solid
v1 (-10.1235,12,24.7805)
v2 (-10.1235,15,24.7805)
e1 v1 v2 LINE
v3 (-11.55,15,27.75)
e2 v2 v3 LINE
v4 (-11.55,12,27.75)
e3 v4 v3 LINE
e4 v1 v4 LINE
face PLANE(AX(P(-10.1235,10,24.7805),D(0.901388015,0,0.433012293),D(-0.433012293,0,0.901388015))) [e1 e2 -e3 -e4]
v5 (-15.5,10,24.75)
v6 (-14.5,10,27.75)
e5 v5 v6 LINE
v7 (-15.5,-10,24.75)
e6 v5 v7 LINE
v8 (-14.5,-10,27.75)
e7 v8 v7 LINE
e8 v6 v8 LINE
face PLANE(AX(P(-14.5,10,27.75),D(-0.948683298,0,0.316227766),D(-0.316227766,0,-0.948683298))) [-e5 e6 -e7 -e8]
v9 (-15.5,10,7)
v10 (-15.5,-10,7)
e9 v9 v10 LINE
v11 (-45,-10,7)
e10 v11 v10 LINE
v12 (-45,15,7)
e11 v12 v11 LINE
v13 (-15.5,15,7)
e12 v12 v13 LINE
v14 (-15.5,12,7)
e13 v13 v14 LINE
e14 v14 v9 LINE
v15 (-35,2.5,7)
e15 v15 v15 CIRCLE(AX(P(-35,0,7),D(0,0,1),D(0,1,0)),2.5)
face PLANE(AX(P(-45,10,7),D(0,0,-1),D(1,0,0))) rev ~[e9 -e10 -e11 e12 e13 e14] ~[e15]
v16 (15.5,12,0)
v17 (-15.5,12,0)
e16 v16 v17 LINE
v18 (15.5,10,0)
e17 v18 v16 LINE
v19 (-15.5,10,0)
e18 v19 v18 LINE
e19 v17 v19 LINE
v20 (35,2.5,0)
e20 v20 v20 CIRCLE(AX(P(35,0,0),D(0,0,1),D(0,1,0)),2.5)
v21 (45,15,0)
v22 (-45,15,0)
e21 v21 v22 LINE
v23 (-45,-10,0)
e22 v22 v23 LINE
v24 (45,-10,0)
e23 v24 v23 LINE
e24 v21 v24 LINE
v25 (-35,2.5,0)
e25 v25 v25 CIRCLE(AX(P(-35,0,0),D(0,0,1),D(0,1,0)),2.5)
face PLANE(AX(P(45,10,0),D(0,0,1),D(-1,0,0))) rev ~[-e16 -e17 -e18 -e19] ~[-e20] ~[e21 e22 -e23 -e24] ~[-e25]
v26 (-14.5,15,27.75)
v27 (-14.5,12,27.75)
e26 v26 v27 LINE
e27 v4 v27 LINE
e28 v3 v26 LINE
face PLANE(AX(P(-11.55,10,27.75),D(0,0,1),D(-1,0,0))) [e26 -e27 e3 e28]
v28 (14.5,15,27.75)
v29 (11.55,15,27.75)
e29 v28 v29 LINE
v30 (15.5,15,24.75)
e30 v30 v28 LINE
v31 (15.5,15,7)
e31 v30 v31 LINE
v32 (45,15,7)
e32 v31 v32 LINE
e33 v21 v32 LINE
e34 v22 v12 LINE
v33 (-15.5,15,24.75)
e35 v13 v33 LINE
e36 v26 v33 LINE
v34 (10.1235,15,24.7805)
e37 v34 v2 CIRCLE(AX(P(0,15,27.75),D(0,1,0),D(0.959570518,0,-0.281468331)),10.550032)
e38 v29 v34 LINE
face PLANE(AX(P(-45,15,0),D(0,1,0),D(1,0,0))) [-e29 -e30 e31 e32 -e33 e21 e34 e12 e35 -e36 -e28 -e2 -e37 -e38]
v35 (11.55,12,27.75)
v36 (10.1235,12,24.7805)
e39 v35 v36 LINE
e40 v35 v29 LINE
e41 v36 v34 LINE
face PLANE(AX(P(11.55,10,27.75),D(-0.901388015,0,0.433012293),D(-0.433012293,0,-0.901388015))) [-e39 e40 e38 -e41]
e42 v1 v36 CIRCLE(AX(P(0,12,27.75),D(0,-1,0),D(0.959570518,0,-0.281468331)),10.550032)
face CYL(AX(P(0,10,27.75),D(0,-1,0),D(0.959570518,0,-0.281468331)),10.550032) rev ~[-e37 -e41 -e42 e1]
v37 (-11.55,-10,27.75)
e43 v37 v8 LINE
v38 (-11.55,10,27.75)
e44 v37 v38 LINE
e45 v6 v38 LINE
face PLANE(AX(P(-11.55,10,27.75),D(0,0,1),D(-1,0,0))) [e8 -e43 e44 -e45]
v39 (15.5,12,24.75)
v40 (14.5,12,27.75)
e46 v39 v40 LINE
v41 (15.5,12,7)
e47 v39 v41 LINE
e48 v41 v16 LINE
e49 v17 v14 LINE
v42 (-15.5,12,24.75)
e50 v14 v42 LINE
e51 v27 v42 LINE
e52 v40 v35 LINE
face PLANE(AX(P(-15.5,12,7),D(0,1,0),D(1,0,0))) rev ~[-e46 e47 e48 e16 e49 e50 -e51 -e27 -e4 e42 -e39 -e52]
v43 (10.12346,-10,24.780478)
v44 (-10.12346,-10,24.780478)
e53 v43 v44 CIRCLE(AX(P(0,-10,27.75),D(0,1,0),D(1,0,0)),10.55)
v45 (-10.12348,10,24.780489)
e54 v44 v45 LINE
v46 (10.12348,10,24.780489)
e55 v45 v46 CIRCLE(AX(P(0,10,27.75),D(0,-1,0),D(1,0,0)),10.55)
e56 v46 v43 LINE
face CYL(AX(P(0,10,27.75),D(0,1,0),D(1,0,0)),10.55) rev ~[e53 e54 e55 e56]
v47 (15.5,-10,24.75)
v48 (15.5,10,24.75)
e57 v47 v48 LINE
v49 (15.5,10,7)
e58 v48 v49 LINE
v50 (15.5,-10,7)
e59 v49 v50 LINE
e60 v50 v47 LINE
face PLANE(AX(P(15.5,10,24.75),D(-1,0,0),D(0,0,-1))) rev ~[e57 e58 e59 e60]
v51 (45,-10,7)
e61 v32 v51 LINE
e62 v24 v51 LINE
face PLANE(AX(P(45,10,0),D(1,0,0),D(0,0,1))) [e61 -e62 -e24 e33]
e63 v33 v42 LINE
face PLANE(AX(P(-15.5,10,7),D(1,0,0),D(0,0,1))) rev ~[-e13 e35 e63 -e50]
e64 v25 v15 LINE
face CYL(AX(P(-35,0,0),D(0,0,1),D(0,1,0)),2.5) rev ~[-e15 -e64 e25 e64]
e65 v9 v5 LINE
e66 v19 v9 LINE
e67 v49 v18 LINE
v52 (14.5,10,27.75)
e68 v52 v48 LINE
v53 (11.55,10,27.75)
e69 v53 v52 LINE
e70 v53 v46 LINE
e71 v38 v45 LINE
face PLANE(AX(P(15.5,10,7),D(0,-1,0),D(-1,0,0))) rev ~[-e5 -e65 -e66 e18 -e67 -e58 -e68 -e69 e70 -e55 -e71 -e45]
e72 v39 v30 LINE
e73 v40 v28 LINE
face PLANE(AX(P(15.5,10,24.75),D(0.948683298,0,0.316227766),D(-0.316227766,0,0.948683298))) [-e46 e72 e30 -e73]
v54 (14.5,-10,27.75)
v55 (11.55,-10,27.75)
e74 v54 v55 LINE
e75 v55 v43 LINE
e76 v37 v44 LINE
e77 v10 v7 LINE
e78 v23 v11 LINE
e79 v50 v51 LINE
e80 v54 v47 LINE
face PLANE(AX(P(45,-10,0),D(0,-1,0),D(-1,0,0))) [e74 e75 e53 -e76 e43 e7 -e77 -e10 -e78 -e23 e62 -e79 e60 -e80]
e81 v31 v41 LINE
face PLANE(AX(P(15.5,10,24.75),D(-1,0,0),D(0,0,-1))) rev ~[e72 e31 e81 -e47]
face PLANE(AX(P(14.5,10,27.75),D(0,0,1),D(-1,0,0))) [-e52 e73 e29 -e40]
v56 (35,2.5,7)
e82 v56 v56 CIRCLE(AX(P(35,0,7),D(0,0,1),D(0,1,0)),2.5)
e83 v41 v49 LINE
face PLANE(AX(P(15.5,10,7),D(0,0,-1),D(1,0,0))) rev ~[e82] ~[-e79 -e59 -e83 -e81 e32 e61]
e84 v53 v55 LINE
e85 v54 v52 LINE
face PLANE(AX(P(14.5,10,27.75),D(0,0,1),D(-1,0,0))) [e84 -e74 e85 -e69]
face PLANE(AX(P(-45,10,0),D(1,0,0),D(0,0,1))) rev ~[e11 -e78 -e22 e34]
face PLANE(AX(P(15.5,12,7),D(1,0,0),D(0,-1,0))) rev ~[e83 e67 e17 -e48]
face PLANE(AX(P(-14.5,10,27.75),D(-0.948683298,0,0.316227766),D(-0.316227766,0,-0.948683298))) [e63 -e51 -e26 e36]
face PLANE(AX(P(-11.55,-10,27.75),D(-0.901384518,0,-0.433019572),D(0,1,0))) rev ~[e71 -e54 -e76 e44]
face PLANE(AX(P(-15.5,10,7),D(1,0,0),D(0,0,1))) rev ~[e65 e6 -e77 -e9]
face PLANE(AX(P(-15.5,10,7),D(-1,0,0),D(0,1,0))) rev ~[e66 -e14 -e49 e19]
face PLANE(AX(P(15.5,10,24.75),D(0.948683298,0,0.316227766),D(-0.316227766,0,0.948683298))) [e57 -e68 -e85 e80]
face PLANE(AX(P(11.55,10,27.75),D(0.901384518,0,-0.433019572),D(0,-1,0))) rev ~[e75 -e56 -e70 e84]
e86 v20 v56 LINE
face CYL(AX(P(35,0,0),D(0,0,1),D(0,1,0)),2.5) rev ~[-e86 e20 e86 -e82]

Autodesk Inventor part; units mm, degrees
ref_plane "YZ Plane" through (0, 0, 0) normal (1, 0, 0) x (0, 1, 0)
ref_plane "XZ Plane" through (0, 0, 0) normal (0, 1, 0) x (-1, 0, 0)
ref_plane "XY Plane" through (0, 0, 0) normal (0, 0, 1) x (1, 0, 0)
sketch "Sketch1" plane through (0, 0, 0) normal (0, 0, 1) x (1, 0, 0)
  line L0 (-45, 10) -> (45, 10)
  line L1 (45, 10) -> (45, -10)
  line L2 (45, -10) -> (-45, -10)
  line L3 (-45, -10) -> (-45, 10)
  point P0 (0, 0)
  point P1 (0, 10)
  point P2 (-45, 0)
  dimension "d0" = 20
  dimension "d1" = 90
extrude "Extrusion1" add sketch "Sketch1" along normal blind 27.75
sketch "Sketch3" plane through (-45, 10, 0) normal (0, 1, 0) x (1, 0, 0)
  line L0 (90, 0) -> (90, -27.75) projected
  line L1 (90, -27.75) -> (0, -27.75) projected
  line L2 (90, -27.75) -> (60.5, -27.75)
  line L3 (60.5, -27.75) -> (60.5, -7)
  line L4 (60.5, -7) -> (90, -7)
  line L5 (90, -7) -> (90, -27.75)
  line L6 (83, -7) -> (95, -7) projected
  line L7 (90, 0) -> (0, 0) projected
  point P0 (45, 0)
  point P1 (60.5, -27.75)
  dimension "d8" = 20.75
  dimension "d20" = 15.5
  dimension "d40" = 7
extrude "Extrusion2" cut sketch "Sketch3" against normal through all
mirror "Mirror1" about plane through (0, 0, 0) normal (1, 0, 0) of "Extrusion2"
sketch "Sketch4" plane through (-45, 10, 0) normal (0, 1, 0) x (1, 0, 0)
  circle A0 centre (45, -27.75) radius 10.55
  line L0 (90, 0) -> (0, 0) projected
  line L1 (60.5, -27.75) -> (29.5, -27.75) projected
  point P0 (45, 0)
  point P1 (45, 0)
  dimension "d32" = 21.1
  dimension "d39" = 0
extrude "Extrusion3" cut sketch "Sketch4" against normal through all
chamfer "Chamfer1" distance 1 distance2 3 1 edges at (-15.5, 0, 27.75) measured on face at (-12.2, -3.3333, 27.75)
chamfer "Chamfer2" distance 1 distance2 3 1 edges at (15.5, 0, 27.75) measured on face at (12.2, 3.3333, 27.75)
sketch "Sketch5" plane through (0, 0, 0) normal (0, 0, -1) x (-1, 0, 0)
  line L0 (45, -10) -> (-45, -10) projected
  line L1 (0, 23.0048) -> (0, -23.0048) construction
  point P0 (0, 0)
  point P1 (-35, 0)
  point P2 (35, 0)
  point P3 (0, 0)
  dimension "d23" = 70
hole "Hole1" at (35, 0, 0) at (-35, 0, 0) direction (0, 0, 1) diameter 5 end through all
chamfer "Chamfer3" distance 1 distance2 3 2 edges at (10.55, 0, 27.75) (-10.55, 0, 27.75) measured on face at (13.1833, -3.3333, 27.75) measured on face at (-13.1833, -3.3333, 27.75)
chamfer_without_effect "Chamfer4"
sketch "Sketch6" plane through (-45, 10, 0) normal (0, 1, 0) x (1, 0, 0)
  line L0 (56.55, -27.75) -> (55.1235, -24.7805) projected
  line L1 (59.5, -27.75) -> (56.55, -27.75) projected
  line L2 (60.5, -24.75) -> (59.5, -27.75) projected
  line L3 (60.5, -24.75) -> (60.5, -7) projected
  line L4 (60.5, -7) -> (90, -7) projected
  line L5 (90, 0) -> (90, -7) projected
  line L6 (90, 0) -> (0, 0) projected
  line L7 (0, 0) -> (0, -7) projected
  line L8 (0, -7) -> (29.5, -7) projected
  line L9 (29.5, -7) -> (29.5, -24.75) projected
  line L10 (30.5, -27.75) -> (29.5, -24.75) projected
  line L11 (33.45, -27.75) -> (30.5, -27.75) projected
  line L12 (34.8765, -24.7805) -> (33.45, -27.75) projected
  arc A0 (55.1235, -24.7805) -> (34.8765, -24.7805) centre (45, -27.75) ccw projected
  point P0 (45, 0)
extrude "Extrusion4" add sketch "Sketch6" along normal blind 5
sketch "Sketch7" plane through (-45, -10, 7) normal (0, 0, 1) x (1, 0, 0)
  line L0 (13, 20) -> (27.9, 20) projected
  line L1 (29.5, 22) -> (60.5, 22)
  line L2 (60.5, 22) -> (60.5, 20)
  line L3 (60.5, 20) -> (29.5, 20)
  line L4 (29.5, 20) -> (29.5, 22)
  line L5 (60.5, 25) -> (60.5, 0) projected
  line L6 (29.5, 25) -> (29.5, 0) projected
  point P0 (45, 10)
  dimension "d43" = 2
extrude "Extrusion5" cut sketch "Sketch7" along normal through all both and the other way through all
properties part number "0008-10-057  Fixare seringa 20 Ml" material "ABS Plastic"
